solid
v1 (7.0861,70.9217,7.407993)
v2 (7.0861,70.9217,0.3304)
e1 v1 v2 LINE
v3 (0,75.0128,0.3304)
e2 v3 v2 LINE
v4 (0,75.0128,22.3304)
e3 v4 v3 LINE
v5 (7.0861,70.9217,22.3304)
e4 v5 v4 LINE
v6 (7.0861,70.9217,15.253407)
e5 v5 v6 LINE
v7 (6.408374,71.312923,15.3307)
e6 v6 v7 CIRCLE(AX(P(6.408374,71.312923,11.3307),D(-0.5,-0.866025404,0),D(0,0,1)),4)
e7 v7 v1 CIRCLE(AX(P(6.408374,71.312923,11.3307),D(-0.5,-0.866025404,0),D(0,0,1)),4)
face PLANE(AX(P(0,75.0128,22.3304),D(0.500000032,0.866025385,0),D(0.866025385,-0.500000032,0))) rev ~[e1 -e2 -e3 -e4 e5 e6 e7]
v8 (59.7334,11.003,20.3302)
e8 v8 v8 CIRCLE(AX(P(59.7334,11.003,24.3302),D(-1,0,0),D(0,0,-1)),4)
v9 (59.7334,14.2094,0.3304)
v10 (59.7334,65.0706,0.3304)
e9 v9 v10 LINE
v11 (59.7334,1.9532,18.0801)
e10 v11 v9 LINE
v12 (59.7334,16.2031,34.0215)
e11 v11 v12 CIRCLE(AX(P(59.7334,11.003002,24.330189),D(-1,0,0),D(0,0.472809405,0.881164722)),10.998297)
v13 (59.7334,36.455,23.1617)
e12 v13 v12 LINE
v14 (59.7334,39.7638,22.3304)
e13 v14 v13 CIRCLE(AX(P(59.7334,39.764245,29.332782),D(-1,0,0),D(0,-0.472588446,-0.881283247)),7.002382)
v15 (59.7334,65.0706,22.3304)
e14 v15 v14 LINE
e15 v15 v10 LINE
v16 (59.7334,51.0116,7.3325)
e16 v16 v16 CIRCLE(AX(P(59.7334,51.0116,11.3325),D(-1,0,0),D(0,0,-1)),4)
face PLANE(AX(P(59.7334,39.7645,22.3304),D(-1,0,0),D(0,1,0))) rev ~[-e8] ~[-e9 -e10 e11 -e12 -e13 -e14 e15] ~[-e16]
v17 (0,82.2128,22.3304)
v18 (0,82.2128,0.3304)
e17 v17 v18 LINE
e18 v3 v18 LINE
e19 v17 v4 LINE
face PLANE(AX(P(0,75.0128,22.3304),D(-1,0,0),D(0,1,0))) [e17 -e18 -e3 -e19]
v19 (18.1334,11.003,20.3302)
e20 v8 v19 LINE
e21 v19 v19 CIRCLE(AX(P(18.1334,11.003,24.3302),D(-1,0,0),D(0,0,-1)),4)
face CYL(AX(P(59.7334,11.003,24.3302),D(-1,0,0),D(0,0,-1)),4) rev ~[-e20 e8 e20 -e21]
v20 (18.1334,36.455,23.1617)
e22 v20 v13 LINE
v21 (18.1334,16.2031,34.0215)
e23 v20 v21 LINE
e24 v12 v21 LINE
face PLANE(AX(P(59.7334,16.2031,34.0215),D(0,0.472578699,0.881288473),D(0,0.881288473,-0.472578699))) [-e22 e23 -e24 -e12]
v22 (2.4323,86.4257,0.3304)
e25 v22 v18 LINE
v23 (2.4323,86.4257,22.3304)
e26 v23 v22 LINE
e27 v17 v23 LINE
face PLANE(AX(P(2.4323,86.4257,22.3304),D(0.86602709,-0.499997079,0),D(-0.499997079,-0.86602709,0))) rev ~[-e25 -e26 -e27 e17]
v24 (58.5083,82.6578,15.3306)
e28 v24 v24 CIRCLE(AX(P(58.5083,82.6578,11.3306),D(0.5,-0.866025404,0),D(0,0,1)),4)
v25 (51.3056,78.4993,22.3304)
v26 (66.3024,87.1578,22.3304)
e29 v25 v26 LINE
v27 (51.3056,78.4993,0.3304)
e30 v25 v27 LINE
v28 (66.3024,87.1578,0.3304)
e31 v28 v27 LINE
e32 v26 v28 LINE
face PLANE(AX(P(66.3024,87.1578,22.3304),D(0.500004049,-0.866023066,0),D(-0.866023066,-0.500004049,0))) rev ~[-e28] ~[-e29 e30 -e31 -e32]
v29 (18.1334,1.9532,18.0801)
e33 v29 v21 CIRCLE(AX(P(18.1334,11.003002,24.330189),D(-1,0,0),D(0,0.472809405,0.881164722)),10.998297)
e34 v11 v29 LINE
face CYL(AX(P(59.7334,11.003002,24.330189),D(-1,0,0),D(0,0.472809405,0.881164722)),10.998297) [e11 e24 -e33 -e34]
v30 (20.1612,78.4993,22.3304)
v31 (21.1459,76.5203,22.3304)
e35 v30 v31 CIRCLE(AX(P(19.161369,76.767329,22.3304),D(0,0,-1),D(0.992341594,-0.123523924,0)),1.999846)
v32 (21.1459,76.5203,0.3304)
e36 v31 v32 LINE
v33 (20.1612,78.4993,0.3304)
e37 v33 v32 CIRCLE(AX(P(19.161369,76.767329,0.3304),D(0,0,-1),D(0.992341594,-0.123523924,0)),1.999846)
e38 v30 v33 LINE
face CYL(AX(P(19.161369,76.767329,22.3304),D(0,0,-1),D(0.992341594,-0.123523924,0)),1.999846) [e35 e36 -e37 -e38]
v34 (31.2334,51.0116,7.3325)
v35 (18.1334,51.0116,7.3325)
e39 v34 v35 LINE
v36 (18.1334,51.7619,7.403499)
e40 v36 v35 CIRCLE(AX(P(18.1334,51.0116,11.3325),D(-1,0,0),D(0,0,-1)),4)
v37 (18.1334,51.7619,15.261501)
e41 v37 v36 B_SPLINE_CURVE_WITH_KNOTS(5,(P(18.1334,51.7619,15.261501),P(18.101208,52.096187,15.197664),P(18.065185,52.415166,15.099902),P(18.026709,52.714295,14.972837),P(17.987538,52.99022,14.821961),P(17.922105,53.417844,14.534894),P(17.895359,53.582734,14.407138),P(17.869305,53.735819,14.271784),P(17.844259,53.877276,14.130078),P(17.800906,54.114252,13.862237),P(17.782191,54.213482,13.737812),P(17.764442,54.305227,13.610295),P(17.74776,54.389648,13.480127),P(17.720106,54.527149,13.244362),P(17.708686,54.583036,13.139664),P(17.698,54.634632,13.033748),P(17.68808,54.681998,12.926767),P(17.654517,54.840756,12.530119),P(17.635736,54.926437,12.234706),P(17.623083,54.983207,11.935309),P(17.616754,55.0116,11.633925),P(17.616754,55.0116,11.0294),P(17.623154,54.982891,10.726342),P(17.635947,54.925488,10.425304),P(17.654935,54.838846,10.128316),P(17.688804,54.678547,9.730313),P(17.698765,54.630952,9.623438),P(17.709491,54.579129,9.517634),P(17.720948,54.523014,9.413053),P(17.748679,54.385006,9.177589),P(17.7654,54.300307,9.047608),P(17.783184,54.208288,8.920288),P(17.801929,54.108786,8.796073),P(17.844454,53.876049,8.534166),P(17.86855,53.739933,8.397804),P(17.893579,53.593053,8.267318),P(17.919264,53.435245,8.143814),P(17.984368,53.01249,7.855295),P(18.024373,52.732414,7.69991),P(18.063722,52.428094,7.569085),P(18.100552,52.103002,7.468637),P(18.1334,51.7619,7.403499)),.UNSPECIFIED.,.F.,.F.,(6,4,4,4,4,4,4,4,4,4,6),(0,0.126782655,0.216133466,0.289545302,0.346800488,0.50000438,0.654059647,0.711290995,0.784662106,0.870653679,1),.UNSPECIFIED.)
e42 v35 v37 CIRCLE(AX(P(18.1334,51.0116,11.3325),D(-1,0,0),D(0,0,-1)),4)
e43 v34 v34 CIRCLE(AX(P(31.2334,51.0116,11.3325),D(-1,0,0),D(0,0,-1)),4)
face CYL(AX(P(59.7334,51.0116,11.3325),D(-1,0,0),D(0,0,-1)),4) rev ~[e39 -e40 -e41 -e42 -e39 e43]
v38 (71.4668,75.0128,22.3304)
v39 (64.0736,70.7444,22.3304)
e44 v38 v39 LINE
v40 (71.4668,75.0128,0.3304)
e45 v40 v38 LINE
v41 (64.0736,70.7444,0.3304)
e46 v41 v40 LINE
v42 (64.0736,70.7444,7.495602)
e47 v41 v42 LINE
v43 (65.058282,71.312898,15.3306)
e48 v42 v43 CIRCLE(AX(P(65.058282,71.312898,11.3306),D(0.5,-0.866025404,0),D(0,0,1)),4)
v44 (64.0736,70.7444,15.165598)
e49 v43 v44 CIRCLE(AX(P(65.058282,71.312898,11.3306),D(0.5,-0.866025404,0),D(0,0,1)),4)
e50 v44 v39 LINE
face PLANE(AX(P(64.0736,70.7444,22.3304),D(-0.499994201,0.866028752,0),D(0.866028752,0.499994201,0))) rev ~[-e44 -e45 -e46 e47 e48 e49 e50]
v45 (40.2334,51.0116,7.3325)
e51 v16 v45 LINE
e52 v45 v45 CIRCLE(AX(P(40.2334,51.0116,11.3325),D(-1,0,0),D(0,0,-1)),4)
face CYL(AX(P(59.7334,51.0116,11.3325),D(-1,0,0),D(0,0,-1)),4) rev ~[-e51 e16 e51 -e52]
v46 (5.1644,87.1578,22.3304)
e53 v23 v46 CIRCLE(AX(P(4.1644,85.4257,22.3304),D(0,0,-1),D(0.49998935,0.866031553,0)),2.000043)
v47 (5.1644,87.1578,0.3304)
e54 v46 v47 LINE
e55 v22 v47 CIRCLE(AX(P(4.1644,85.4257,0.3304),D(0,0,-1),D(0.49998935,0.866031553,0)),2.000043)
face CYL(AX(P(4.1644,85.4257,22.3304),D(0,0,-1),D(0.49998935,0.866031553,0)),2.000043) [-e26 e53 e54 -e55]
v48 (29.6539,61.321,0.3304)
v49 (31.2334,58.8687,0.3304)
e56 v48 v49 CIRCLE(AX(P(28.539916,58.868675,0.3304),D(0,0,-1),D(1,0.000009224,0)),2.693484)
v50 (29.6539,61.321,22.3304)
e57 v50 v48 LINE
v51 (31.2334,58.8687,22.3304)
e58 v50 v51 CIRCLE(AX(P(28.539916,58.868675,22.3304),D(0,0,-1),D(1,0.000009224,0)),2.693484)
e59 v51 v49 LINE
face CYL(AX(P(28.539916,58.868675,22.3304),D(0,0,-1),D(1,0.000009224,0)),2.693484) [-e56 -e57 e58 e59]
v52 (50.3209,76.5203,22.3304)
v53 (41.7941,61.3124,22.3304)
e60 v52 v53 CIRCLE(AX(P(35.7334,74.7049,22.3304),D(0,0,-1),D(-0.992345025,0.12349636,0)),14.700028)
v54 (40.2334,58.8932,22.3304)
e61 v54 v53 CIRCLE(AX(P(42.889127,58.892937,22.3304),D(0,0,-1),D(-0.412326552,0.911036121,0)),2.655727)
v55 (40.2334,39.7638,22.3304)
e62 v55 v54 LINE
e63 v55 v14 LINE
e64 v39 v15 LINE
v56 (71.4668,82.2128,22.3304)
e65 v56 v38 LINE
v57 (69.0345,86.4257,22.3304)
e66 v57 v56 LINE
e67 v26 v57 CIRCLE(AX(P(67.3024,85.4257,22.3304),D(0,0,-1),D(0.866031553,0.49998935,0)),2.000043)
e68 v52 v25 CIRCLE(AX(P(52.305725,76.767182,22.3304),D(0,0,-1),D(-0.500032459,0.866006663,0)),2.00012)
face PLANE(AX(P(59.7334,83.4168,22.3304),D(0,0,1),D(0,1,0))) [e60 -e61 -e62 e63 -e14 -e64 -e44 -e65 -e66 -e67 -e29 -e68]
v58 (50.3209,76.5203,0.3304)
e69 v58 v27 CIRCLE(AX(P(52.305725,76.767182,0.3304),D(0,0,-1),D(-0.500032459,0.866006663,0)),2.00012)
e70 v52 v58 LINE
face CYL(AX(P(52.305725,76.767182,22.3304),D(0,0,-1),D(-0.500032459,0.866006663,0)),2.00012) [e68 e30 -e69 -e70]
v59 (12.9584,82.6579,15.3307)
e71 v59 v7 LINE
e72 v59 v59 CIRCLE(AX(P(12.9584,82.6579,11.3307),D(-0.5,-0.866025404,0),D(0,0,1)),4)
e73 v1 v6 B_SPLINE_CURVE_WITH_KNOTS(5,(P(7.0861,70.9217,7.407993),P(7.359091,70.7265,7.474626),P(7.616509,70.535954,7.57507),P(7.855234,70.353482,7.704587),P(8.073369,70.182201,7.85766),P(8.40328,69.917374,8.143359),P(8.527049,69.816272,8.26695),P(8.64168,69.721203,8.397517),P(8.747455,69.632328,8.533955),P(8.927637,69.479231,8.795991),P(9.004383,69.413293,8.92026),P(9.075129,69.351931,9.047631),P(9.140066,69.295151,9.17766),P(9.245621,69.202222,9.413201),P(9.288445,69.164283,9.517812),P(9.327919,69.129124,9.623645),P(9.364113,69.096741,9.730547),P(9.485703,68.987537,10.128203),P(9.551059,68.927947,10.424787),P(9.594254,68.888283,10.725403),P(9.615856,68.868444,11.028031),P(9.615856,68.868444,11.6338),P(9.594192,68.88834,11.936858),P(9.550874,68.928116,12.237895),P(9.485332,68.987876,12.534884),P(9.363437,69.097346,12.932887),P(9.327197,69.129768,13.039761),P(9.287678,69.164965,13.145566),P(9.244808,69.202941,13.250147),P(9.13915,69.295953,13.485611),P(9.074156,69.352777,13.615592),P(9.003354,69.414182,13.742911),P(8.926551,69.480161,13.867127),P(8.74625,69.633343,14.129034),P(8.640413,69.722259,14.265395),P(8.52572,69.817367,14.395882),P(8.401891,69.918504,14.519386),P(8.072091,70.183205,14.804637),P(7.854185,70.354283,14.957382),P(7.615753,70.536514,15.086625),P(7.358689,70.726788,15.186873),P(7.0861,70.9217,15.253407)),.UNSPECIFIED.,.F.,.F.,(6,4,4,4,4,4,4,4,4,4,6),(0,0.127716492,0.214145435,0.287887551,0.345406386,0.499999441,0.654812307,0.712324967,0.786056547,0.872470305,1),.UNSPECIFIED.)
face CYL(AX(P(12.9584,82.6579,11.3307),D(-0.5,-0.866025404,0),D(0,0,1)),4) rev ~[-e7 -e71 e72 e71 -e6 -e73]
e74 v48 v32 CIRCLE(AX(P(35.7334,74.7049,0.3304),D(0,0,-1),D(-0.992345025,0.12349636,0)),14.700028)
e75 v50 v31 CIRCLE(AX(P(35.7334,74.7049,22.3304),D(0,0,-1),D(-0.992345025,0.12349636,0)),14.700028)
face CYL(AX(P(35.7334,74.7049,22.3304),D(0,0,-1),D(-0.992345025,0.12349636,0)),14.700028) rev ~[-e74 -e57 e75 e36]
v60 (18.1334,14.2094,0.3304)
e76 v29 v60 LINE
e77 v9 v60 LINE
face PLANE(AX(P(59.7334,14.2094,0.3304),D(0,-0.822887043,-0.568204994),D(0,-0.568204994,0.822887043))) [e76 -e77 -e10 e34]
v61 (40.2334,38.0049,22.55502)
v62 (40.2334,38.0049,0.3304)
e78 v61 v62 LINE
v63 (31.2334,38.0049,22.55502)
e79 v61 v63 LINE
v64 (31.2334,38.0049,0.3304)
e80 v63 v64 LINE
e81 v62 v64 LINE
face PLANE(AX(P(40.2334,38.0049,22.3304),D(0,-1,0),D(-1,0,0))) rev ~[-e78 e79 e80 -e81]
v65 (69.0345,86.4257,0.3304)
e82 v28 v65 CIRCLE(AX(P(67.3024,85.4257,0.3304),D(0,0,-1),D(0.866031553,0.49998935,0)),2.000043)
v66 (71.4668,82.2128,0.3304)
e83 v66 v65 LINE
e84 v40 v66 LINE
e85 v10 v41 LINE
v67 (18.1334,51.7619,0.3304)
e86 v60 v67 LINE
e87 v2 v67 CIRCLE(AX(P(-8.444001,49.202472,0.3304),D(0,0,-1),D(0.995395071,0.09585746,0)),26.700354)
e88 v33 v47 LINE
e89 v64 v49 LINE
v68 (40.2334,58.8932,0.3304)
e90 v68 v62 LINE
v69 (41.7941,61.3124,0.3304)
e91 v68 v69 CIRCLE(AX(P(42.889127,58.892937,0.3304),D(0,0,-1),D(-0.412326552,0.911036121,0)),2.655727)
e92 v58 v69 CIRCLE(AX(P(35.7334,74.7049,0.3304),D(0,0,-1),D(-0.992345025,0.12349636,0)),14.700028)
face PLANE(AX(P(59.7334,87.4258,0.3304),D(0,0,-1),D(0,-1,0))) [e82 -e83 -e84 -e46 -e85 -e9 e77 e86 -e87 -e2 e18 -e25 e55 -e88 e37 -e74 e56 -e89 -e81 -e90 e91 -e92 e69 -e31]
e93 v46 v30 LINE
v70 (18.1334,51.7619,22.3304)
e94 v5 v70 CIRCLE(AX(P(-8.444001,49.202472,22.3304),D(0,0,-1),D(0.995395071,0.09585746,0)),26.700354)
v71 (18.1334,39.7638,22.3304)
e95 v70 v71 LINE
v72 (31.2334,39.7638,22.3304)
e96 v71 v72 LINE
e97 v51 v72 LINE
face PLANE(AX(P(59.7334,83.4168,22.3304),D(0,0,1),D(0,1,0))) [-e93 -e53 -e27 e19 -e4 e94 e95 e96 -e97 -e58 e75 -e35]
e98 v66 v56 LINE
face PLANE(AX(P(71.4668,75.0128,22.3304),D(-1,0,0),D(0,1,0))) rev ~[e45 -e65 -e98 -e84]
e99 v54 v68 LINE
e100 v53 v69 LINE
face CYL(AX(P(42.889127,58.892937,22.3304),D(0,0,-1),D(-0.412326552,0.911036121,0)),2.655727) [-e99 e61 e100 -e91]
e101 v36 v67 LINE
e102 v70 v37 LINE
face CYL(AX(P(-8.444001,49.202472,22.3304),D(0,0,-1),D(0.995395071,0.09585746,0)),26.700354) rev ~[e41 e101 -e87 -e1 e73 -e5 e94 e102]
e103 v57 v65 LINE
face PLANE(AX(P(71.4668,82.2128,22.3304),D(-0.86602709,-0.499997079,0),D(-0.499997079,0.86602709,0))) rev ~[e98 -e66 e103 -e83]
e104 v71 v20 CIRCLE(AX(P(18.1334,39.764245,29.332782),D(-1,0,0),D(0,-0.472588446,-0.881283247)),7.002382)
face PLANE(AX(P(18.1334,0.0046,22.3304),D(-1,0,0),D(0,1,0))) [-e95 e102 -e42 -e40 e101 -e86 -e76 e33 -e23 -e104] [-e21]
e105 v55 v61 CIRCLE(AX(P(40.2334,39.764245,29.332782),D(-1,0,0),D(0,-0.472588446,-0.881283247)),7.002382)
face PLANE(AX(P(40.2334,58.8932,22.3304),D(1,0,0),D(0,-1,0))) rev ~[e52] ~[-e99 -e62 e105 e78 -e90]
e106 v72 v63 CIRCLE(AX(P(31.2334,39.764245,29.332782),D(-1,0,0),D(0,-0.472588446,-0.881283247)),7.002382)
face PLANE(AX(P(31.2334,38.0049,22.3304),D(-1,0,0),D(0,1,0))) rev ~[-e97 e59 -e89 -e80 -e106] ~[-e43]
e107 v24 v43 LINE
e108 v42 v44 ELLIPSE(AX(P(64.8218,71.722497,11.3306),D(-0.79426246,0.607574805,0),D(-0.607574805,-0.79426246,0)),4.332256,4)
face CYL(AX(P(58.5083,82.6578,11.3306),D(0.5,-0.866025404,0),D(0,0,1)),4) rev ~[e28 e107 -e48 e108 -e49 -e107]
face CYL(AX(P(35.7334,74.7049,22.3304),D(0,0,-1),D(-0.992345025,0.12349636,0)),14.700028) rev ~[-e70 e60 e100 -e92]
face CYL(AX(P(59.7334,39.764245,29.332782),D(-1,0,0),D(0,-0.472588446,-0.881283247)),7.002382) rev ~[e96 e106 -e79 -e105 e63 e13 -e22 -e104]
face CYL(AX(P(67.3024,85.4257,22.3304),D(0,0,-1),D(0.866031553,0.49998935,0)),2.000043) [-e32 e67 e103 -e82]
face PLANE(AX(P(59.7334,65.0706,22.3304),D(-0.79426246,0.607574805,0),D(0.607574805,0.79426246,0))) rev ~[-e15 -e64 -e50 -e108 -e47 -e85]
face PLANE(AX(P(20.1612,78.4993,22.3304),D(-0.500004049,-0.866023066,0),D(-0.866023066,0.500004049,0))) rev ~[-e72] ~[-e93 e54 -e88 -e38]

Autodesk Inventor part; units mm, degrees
ref_plane "YZ Plane" through (0, 0, 0) normal (1, 0, 0) x (0, 1, 0)
ref_plane "XZ Plane" through (0, 0, 0) normal (0, 1, 0) x (-1, 0, 0)
ref_plane "XY Plane" through (0, 0, 0) normal (0, 0, 1) x (1, 0, 0)
sketch "Sketch1" plane through (59.7334, 64.5979, 5.1545) normal (1, 0, 0) x (0, 1, 0)
  line L0 (18.8189, 17.1759) -> (22.8279, 17.1759) projected
  line L1 (18.8189, -4.3241) -> (22.8279, -4.3241) projected
  line L2 (22.3279, -4.8241) -> (19.3338, -4.8241) projected
  arc A0 (-48.3948, 28.867) -> (-62.6447, 12.9256) centre (-53.5949, 19.1757) ccw
  line L3 (-48.3948, 28.867) -> (-28.1429, 18.0072)
  line L4 (-24.8341, 17.1759) -> (22.8279, 17.1759)
  line L5 (22.8279, 17.1759) -> (22.8279, -4.3241)
  line L6 (22.8279, -4.3241) -> (22.8279, -4.8241)
  line L7 (22.8279, -4.8241) -> (22.3279, -4.8241)
  line L8 (22.3279, -4.8241) -> (-50.3885, -4.8241)
  line L9 (-50.3885, -4.8241) -> (-62.6447, 12.9256)
  arc A1 (-28.1429, 18.0072) -> (-24.8341, 17.1759) centre (-24.8333, 24.1792) ccw
  point P0 (-48.3934, 28.8694)
  point P1 (0.4728, 17.1759)
  point P2 (-13.5862, 6.178)
sketch "Sketch2" plane through (47.0121, 65.2772, 22.3304) normal (0, 0, 1) x (1, 0, 0)
  line L0 (17.0615, 5.4672) -> (24.4547, 9.7356)
  line L1 (24.4547, 9.7356) -> (24.4547, 16.9356)
  line L2 (24.4547, 16.9356) -> (22.0224, 21.1485)
  arc A0 (22.0224, 21.1485) -> (19.2903, 21.8806) centre (20.2903, 20.1485) ccw
  line L3 (22.0224, 21.1485) -> (20.2903, 20.1485) construction
  line L4 (19.2903, 21.8806) -> (20.2903, 20.1485) construction
  line L5 (19.2903, 21.8806) -> (4.2935, 13.2221)
  arc A1 (4.2935, 13.2221) -> (3.3088, 11.2431) centre (5.2935, 11.4901) ccw
  arc A2 (-25.8662, 11.2431) -> (3.3088, 11.2431) centre (-11.2787, 9.4277) ccw
  arc A3 (-25.8662, 11.2431) -> (-26.8509, 13.2221) centre (-27.8509, 11.4901) ccw
  line L6 (-26.8509, 13.2221) -> (-41.8477, 21.8806)
  arc A4 (-41.8477, 21.8806) -> (-44.5798, 21.1485) centre (-42.8477, 20.1485) ccw
  line L7 (-44.5798, 21.1485) -> (-47.0121, 16.9356)
  line L8 (-47.0121, 16.9356) -> (-47.0121, 16.9356)
  line L9 (-47.0121, 9.7356) -> (-39.9003, 5.6296) projected
  line L10 (-39.926, 5.6445) -> (-39.2899, 5.1683) projected
  line L11 (-39.926, 5.6445) -> (-47.0121, 9.7356)
  arc A5 (-28.8787, -13.5153) -> (-39.926, 5.6445) centre (-55.4557, -16.0746) ccw
  line L12 (12.7213, -0.2066) -> (17.0615, 5.4672)
  line L13 (12.7213, -65.2726) -> (12.7213, -49.0741) projected
  line L14 (12.7213, -65.2726) -> (12.7213, -25.5127)
  line L15 (12.7213, -65.2726) -> (-28.8787, -65.2726)
  line L16 (12.7213, -25.5127) -> (12.7213, -0.2066)
  line L17 (-28.8787, -65.2726) -> (-28.8787, -13.5153)
  line L18 (-47.0121, 9.7356) -> (-47.0121, 16.9356)
  line L19 (-6.7787, -27.2723) -> (-15.7787, -27.2723) projected
  line L20 (-6.7787, -27.2723) -> (-15.7787, -27.2723)
  line L21 (-6.7787, -27.2723) -> (-15.7787, -27.2723)
  line L22 (-15.7787, -27.2723) -> (-15.7787, -3.6713)
  line L23 (-15.7787, -3.6713) -> (-6.7787, -3.6713)
  line L24 (-6.7787, -3.6713) -> (-6.7787, -27.2723)
  arc A6 (-15.7787, -6.4085) -> (-17.3582, -3.9562) centre (-18.4721, -6.4085) ccw
  arc A7 (-5.218, -3.9648) -> (-6.7787, -6.384) centre (-4.1232, -6.384) ccw
  point P0 (-47.0121, -65.2772)
  point P1 (12.7213, -49.0728)
  point P2 (12.7213, -63.3241)
  point P3 (-15.7787, -5.7822)
  dimension "d3" = 2
  dimension "d4" = 90
  dimension "d5" = 2
  dimension "d6" = 26.7
  dimension "d7" = 2
  dimension "d8" = 90
  dimension "d13" = 0
extrude "Extrusion1" add sketch "Sketch1" along normal mid plane 200
extrude "Extrusion2" cut sketch "Sketch2" along normal mid plane 200 contours L12 L16 L14 L13 L15 L17 A5 L9 L18 L7 A4 L6 A3 A2 A6 L22 L19 L24 A7 A1 L5 A0 L2 L1 L0 keep common part
sketch "Sketch5" plane through (35.7334, 74.705, 22.3304) normal (0, 0, 1) x (1, 0, 0)
  point P0 (-35.7334, -74.705)
sketch "Sketch3" plane through (66.3024, 87.1578, 22.3304) normal (-0.4999998, 0.8660255, 0) x (0.8660255, 0.4999998, 0)
  ellipse E0 centre (-8.9999, 10.9997) end of major axis (-4.913, 11.323) minor radius 4.0997 projected
  point P0 (-100.9985, 22.3304)
sketch "Sketch4" plane through (20.1613, 78.4993, 22.3304) normal (0.5000005, 0.8660251, 0) x (0.8660251, -0.5000005, 0)
  ellipse E0 centre (-8.3172, 10.9997) end of major axis (-5.344, 8.1771) minor radius 4.0996 projected
  point P0 (21.7896, 22.3304)
sketch "Sketch6" plane through (18.1334, 14.2094, 0.3304) normal (-1, 0, 0) x (0, 0, 1)
  point P0 (-0.3304, -14.2094)
hole "Hole1" at (58.5083, 82.6578, 11.3306) direction (0.4999998, -0.8660255, 0) diameter 8 end through all clearance for "Countersunk Flat Head Screw ISO 2009/7046" size "M8" standard "ISO"
hole "Hole2" at (12.9584, 82.6579, 11.3307) direction (-0.5000005, -0.8660251, 0) diameter 8 end through all clearance for "Slotted Cheese Head Screw ISO 1207" size "M8" standard "ISO"
hole "Hole3" at (59.7334, 51.0116, 11.3325) at (59.7334, 11.003, 24.3302) direction (-1, 0, 0) diameter 8 end through all
properties part number "YZ_Roller"
